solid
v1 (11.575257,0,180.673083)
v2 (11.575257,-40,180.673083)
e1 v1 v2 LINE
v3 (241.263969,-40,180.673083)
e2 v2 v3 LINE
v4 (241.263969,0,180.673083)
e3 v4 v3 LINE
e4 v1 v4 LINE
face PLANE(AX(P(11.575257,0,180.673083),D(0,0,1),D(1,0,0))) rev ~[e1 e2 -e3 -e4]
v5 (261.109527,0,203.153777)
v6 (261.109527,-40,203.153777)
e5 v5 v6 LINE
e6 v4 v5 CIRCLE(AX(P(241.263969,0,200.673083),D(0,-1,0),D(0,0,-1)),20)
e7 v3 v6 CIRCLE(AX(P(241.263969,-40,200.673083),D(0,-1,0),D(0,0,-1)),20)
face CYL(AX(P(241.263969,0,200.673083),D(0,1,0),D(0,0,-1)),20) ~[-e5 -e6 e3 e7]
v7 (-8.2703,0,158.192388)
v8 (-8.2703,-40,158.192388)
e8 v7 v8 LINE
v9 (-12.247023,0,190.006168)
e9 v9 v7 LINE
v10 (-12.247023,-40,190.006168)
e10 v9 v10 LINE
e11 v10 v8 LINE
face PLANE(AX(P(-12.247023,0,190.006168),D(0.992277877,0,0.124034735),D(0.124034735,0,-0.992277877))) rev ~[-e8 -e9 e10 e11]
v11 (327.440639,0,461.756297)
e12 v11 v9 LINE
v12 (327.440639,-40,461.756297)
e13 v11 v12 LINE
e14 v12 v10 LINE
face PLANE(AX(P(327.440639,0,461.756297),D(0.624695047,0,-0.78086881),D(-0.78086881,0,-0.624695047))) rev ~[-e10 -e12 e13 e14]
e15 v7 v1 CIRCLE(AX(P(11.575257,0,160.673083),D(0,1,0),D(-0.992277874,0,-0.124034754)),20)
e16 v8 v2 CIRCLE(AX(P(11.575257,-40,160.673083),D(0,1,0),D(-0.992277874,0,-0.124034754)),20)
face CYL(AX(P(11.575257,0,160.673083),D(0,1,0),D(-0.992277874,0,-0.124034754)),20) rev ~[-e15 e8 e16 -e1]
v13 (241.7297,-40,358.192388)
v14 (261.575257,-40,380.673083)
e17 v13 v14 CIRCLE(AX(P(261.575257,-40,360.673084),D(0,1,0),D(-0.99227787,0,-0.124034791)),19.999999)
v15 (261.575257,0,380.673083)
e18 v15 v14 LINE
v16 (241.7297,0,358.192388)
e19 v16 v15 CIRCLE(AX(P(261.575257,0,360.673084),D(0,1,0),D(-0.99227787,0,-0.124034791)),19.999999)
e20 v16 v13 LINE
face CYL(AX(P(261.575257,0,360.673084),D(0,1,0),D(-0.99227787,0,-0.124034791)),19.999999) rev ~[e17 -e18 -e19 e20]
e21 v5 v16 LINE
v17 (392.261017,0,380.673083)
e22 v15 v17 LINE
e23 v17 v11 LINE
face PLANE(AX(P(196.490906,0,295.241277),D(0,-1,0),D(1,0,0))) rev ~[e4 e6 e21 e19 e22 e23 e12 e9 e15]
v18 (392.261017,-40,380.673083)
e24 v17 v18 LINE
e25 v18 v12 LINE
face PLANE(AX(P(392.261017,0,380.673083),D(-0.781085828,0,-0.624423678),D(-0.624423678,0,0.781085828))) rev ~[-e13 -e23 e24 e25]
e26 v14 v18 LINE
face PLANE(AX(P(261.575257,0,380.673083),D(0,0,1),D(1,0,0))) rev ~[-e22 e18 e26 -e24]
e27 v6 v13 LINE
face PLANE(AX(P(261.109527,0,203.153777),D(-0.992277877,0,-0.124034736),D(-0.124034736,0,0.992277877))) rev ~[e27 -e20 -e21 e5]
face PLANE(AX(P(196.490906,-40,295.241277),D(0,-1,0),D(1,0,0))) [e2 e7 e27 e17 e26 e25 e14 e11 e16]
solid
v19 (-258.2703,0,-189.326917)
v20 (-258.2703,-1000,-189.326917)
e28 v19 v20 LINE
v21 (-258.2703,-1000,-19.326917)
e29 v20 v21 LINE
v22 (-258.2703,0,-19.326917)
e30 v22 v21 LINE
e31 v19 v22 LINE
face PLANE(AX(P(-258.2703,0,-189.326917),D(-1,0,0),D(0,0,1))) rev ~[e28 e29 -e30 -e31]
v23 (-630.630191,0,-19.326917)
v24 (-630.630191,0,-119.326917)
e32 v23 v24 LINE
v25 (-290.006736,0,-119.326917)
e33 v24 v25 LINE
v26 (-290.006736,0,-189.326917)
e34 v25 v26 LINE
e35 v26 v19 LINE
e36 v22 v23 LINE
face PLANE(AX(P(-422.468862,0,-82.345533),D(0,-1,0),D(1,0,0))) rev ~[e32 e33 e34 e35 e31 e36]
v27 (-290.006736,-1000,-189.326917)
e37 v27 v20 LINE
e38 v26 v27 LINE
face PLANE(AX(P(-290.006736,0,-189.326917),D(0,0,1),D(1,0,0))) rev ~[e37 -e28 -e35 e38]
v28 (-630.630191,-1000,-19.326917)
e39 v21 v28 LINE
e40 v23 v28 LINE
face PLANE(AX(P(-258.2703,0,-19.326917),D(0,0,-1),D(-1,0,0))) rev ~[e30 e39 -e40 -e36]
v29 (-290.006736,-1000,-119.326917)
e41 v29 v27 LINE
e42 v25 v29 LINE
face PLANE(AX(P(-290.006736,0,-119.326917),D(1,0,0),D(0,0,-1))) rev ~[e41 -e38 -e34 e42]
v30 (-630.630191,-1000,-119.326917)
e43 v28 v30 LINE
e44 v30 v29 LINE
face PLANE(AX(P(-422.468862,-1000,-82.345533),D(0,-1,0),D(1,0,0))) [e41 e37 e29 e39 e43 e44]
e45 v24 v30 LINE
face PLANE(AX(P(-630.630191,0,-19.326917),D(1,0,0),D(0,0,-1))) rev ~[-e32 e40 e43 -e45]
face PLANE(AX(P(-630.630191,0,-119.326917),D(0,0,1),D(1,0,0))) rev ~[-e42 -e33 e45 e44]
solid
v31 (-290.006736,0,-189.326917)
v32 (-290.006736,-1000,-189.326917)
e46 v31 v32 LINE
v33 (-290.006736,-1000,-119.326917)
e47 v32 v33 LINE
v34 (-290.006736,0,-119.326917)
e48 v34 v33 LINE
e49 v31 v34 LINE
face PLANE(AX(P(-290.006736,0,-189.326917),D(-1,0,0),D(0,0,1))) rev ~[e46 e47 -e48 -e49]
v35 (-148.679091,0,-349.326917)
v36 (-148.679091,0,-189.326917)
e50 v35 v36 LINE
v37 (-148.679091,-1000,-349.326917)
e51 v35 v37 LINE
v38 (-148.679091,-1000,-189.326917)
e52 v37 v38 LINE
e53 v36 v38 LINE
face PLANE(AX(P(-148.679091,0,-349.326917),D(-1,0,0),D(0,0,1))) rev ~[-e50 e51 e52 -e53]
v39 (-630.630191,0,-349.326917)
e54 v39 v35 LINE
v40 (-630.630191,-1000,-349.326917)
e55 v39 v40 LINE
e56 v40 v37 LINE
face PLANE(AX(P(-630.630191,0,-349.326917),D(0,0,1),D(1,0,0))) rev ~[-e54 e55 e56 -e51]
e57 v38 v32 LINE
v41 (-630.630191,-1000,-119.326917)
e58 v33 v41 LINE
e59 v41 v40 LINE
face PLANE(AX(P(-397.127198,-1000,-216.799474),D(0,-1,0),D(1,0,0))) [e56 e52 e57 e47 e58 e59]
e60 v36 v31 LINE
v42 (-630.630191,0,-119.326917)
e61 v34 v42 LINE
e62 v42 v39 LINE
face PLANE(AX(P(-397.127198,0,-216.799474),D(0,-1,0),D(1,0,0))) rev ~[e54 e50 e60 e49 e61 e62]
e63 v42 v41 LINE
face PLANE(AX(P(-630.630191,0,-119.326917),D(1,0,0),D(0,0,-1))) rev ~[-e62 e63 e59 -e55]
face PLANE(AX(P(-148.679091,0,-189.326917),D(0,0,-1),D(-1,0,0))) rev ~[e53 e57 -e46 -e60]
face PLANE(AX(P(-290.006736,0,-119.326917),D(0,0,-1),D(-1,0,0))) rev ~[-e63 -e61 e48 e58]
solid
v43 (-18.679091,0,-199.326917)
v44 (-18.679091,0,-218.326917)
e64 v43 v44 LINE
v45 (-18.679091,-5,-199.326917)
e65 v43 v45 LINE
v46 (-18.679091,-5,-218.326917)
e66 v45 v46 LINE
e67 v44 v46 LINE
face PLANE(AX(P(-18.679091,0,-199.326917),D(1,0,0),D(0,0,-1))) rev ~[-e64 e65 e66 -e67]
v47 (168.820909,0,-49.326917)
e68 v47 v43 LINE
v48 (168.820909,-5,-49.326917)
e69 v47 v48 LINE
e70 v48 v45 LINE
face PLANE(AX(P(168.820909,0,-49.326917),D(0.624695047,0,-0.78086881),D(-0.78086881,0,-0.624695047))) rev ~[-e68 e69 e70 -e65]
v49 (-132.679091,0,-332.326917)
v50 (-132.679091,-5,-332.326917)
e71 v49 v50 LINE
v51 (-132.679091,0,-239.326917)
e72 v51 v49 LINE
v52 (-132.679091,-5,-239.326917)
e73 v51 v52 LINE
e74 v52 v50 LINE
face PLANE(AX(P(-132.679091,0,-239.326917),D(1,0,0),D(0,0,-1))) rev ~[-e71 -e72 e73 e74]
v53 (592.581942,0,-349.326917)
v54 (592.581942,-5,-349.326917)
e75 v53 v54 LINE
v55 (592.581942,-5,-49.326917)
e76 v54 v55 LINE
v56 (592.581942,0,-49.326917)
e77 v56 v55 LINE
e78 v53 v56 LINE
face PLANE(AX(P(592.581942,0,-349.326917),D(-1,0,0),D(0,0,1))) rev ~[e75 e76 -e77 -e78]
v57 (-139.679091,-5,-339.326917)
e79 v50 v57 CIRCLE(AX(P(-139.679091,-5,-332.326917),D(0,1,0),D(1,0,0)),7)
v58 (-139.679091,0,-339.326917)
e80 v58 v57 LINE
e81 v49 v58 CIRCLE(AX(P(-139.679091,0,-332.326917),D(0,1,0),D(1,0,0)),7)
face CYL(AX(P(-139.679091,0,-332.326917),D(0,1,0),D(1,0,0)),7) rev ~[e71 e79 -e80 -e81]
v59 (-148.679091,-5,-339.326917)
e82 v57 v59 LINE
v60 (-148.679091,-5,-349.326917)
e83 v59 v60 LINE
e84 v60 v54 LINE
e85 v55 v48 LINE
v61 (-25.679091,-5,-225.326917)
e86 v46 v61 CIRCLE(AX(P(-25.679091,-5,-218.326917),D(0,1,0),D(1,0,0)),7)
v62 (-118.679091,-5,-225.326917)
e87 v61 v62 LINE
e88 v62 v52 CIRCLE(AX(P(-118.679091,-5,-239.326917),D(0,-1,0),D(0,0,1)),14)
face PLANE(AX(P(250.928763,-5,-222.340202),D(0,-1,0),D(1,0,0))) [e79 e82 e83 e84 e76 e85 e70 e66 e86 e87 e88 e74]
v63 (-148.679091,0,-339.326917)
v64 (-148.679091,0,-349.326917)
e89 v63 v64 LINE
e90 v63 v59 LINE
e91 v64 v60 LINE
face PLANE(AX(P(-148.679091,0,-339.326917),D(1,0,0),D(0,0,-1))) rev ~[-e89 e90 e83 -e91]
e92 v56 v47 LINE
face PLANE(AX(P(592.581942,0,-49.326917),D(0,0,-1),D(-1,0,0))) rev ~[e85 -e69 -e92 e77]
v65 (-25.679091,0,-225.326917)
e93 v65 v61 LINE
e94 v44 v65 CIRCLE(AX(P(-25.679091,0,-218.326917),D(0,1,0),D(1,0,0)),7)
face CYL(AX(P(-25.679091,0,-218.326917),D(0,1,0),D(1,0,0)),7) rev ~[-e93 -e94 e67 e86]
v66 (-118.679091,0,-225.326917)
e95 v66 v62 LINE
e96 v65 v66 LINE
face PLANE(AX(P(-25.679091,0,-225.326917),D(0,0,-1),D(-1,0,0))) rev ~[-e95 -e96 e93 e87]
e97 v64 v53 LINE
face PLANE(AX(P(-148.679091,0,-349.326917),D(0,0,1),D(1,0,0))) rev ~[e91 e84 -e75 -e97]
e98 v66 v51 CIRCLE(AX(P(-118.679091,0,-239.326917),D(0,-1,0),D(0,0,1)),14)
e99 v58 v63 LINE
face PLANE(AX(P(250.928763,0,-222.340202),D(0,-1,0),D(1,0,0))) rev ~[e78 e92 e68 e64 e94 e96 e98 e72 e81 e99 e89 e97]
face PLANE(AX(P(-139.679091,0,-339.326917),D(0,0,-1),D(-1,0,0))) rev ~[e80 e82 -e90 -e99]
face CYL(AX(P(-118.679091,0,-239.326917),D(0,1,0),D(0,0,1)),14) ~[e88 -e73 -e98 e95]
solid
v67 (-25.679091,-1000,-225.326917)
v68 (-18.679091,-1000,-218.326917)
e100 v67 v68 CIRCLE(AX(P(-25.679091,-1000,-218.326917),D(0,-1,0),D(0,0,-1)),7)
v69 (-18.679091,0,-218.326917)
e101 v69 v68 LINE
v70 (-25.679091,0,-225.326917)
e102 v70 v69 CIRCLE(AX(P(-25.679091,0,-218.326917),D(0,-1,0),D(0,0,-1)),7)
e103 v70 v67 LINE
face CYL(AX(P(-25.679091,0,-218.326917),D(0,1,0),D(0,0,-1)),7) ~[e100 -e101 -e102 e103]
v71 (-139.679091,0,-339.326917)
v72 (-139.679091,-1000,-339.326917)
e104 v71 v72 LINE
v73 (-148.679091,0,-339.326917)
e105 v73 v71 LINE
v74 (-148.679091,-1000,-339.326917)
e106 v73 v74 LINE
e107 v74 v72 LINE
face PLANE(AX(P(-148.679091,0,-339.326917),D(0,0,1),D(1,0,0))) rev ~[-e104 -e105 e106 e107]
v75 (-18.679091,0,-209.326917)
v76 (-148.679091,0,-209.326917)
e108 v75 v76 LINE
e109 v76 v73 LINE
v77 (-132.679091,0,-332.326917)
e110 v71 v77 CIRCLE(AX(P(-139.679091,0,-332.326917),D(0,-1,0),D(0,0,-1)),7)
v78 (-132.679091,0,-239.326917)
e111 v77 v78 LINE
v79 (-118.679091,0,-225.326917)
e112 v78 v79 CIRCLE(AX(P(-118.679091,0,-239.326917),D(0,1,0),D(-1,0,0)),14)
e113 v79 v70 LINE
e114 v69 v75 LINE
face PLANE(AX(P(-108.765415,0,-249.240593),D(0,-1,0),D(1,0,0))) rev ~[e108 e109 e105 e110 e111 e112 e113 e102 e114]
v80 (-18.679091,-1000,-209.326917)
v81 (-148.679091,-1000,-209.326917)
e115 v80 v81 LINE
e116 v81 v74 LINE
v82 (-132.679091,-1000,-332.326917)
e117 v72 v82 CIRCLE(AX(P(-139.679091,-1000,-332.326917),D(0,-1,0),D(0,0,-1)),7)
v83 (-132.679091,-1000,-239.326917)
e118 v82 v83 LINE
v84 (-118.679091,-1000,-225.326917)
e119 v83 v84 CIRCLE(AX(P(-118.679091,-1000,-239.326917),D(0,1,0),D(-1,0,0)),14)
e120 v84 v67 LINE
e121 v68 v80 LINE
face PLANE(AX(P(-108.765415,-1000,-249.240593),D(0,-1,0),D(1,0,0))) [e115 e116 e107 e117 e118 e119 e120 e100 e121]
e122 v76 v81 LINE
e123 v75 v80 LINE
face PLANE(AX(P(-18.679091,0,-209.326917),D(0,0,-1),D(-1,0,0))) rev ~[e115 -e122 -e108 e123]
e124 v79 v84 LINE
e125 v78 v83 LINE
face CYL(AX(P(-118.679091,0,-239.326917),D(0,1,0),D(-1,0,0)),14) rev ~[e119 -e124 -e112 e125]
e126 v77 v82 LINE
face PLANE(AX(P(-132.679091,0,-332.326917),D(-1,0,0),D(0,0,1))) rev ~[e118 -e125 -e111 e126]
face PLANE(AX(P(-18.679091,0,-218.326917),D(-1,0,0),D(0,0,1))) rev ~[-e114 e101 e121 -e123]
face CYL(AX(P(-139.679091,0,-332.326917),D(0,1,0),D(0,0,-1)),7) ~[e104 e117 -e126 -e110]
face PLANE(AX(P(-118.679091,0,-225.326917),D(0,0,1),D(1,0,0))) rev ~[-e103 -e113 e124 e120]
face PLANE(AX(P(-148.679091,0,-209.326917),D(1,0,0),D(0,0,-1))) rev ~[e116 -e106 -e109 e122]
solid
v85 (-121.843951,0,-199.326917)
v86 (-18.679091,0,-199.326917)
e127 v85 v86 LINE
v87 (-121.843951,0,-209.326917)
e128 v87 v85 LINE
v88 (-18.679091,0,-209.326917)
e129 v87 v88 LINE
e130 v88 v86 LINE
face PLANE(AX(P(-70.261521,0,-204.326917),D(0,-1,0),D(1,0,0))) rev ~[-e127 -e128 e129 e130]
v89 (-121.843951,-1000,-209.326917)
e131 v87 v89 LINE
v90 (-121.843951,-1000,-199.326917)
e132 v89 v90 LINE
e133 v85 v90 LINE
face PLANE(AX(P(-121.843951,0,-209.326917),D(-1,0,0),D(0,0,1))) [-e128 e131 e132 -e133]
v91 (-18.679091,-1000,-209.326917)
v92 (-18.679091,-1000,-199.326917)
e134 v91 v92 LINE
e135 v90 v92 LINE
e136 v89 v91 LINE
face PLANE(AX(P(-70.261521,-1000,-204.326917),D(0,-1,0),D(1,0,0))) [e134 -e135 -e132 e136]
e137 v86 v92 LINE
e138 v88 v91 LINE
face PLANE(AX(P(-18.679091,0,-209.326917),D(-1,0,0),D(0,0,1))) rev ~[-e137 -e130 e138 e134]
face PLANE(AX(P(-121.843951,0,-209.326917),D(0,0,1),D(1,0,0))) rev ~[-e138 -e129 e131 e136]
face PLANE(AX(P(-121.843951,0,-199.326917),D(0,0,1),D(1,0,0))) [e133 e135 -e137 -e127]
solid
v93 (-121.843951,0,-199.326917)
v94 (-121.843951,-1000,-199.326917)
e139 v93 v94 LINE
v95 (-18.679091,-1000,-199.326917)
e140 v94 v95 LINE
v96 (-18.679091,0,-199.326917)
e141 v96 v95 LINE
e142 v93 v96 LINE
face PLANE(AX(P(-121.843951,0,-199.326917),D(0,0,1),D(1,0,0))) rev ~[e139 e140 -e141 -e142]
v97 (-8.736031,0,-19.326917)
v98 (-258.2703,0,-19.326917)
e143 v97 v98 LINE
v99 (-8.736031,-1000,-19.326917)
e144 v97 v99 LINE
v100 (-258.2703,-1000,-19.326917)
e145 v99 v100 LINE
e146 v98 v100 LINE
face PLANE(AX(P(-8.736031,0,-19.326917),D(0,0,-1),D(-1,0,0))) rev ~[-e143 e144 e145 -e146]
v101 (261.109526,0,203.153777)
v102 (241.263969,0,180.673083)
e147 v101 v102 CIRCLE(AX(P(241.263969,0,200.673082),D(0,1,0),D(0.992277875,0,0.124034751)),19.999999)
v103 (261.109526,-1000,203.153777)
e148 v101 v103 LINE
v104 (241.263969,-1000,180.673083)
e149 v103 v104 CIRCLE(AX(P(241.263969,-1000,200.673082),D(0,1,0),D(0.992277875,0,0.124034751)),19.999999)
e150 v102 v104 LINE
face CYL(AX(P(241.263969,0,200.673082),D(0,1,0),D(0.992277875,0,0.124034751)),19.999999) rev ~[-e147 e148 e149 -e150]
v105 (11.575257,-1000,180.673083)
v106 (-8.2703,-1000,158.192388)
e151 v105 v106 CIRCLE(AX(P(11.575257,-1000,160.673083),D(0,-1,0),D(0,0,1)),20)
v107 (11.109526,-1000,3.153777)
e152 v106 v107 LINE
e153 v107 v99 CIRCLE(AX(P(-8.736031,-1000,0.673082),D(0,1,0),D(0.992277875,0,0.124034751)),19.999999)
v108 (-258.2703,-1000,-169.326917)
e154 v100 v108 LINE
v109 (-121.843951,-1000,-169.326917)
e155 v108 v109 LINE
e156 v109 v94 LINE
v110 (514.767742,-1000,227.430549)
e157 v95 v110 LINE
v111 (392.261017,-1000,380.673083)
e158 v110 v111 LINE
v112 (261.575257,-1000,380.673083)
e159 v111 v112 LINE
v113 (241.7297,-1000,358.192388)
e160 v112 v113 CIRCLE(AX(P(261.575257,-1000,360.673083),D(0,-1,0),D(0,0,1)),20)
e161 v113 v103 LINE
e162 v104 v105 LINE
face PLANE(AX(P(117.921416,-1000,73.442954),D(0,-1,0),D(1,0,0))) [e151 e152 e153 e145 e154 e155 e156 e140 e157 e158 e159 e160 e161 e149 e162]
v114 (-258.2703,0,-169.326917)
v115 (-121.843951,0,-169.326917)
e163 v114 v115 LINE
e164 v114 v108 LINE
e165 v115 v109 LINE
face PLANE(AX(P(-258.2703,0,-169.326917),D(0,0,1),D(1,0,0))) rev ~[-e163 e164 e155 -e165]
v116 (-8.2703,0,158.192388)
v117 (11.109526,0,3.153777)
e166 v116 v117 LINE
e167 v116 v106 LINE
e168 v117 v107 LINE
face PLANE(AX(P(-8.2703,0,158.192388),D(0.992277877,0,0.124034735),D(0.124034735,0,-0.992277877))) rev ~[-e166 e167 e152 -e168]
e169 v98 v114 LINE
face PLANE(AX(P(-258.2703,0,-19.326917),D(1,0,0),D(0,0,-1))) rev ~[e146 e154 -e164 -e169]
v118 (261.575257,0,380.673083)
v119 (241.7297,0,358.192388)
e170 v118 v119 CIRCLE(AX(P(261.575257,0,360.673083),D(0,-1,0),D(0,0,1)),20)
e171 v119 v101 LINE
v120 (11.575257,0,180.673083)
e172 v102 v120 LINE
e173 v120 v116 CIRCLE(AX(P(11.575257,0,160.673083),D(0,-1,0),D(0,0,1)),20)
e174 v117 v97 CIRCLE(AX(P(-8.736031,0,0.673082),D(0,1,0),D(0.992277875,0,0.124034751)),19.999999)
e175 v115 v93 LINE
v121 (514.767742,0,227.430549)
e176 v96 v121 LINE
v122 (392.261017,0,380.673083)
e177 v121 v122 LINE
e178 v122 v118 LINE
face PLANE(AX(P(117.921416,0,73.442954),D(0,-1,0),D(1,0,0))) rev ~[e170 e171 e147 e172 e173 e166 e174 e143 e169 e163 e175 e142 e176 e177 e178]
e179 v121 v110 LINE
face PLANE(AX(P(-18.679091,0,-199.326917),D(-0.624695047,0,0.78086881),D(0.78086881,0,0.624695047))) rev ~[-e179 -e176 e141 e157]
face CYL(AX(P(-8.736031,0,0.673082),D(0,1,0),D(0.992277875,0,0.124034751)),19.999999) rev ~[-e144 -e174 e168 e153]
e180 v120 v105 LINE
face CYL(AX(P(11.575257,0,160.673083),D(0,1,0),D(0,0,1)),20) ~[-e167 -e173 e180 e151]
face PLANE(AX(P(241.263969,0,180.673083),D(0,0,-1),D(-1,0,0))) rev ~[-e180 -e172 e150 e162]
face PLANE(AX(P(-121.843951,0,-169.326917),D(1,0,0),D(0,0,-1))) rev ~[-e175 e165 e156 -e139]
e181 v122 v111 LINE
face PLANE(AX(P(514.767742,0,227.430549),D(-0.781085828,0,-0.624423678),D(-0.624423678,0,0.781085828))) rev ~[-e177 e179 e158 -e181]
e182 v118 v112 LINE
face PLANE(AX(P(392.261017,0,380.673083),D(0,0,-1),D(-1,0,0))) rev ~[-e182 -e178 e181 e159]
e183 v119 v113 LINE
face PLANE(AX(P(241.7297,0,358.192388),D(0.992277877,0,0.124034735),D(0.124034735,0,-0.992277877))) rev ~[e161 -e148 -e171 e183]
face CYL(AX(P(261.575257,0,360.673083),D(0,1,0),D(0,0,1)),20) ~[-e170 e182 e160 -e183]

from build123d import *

# Parameters (mm, degrees)
F1_DEPTH = 1000
F2_DEPTH = 1000
F3_DEPTH = 1000
F4_DEPTH = 40
F5_DEPTH = 1000
F0_W     = 103.16486
F0_H     = 10
F6_DEPTH = 1000
F7_DEPTH = 5


# Not quite as in the source:
# - ends of sketch curves that miss each other by under 0.0002 mm in the source are joined


with BuildPart() as f1:
    # F0 (on Front) → F1 (new body)
    with BuildSketch(Plane.XZ):
        Polygon((-148.679091, -189.326917), (-258.2703, -189.326917), (-290.006736, -189.326917), (-290.006736, -119.326917), (-630.630191, -119.326917), (-630.630191, -299.326917), (-148.679091, -299.326917), (-148.679091, -209.326917), align=None)
        Polygon((-148.679091, -299.326917), (-630.630191, -299.326917), (-630.630191, -349.326917), (-148.679091, -349.326917), (-148.679091, -339.326917), align=None)
    extrude(amount=F1_DEPTH)


with BuildPart() as f2:
    # F0 (on Front) → F2 (new body)
    with BuildSketch(Plane.XZ):
        Polygon((-258.2703, -169.326917), (-258.2703, -19.326917), (-630.630191, -19.326917), (-630.630191, -119.326917), (-290.006736, -119.326917), (-290.006736, -189.326917), (-258.2703, -189.326917), align=None)
    extrude(amount=F2_DEPTH)


with BuildPart() as f3:
    # F0 (on Front) → F3 (new body)
    with BuildSketch(Plane.XZ):
        with BuildLine():
            Line((-8.736031, -19.326917), (-258.2703, -19.326917))
            Line((-258.2703, -19.326917), (-258.2703, -169.326917))
            Line((-258.2703, -169.326917), (-148.679091, -169.326917))
            Line((-148.679091, -169.326917), (-121.843951, -169.326917))
            Line((-121.843951, -169.326917), (-121.843951, -199.326917))
            Line((-121.843951, -199.326917), (-18.679091, -199.326917))
            Line((-18.679091, -199.326917), (168.8209090686, -49.3269170857))
            Line((168.8209090686, -49.3269170857), (514.767742, 227.430549))
            Line((514.767742, 227.430549), (392.2610169622, 380.6730829698))
            Line((392.2610169622, 380.6730829698), (261.575257, 380.673083))
            ThreePointArc((261.575257, 380.673083), (246.5816933606, 373.9091341252), (241.7296995119, 358.192387939))
            Line((241.7296995119, 358.192387939), (261.109526, 203.153777))
            ThreePointArc((261.109526, 203.153777), (256.2575323111, 187.4370315028), (241.263969, 180.673083))
            Line((241.263969, 180.673083), (11.575257, 180.673083))
            ThreePointArc((11.575257, 180.673083), (-3.4183066394, 173.9091341252), (-8.2703004881, 158.192387939))
            Line((-8.2703004881, 158.192387939), (11.109526, 3.153777))
            ThreePointArc((11.109526, 3.153777), (6.2575323111, -12.5629684972), (-8.736031, -19.326917))
        make_face()
    extrude(amount=F3_DEPTH)


with BuildPart() as f4:
    # F0 (on Front) → F4 (new body)
    with BuildSketch(Plane.XZ):
        with BuildLine():
            Line((-12.247023, 190.006168), (-8.2703004714, 158.1923879411))
            ThreePointArc((-8.2703004714, 158.1923879411), (-3.4183066394, 173.9091341252), (11.575257, 180.673083))
            Line((11.575257, 180.673083), (241.263969, 180.673083))
            ThreePointArc((241.263969, 180.673083), (256.2575323111, 187.4370315028), (261.1095266112, 203.1537770764))
            Line((261.1095266112, 203.1537770764), (241.7297, 358.192388))
            ThreePointArc((241.7297, 358.192388), (246.5816933606, 373.9091341252), (261.575257, 380.673083))
            Line((261.575257, 380.673083), (392.261017, 380.673083))
            Line((392.261017, 380.673083), (327.4406389587, 461.756296967))
            Line((327.4406389587, 461.756296967), (-12.247023, 190.006168))
        make_face()
    extrude(amount=F4_DEPTH)


with BuildPart() as f5:
    # F0 (on Front) → F5 (new body)
    with BuildSketch(Plane.XZ):
        with BuildLine():
            Line((-121.843951, -209.326917), (-148.679091, -209.326917))
            Line((-148.679091, -209.326917), (-148.679091, -299.326917))
            Line((-148.679091, -299.326917), (-148.679091, -339.326917))
            Line((-148.679091, -339.326917), (-139.679091, -339.326917))
            ThreePointArc((-139.679091, -339.326917), (-134.7293435317, -337.2766644683), (-132.679091, -332.326917))
            Line((-132.679091, -332.326917), (-132.679091, -239.326917))
            ThreePointArc((-132.679091, -239.326917), (-128.5785859366, -229.4274220634), (-118.679091, -225.326917))
            Line((-118.679091, -225.326917), (-25.679091, -225.326917))
            ThreePointArc((-25.679091, -225.326917), (-20.7293435317, -223.2766644683), (-18.679091, -218.326917))
            Line((-18.679091, -218.326917), (-18.679091, -209.326917))
            Line((-18.679091, -209.326917), (-121.843951, -209.326917))
        make_face()
    extrude(amount=F5_DEPTH)


with BuildPart() as f6:
    # F0 (on Front) → F6 (new body)
    with BuildSketch(Plane.XZ):
        with Locations((-70.261521, -204.326917)):
            Rectangle(F0_W, F0_H)
    extrude(amount=F6_DEPTH)


with BuildPart() as f7:
    # F0 (on Front) → F7 (new body)
    with BuildSketch(Plane.XZ):
        with BuildLine():
            Line((168.8209090686, -49.3269170857), (-18.679091, -199.326917))
            Line((-18.679091, -199.326917), (-18.679091, -209.326917))
            Line((-18.679091, -209.326917), (-18.679091, -218.326917))
            ThreePointArc((-18.679091, -218.326917), (-20.7293435317, -223.2766644683), (-25.679091, -225.326917))
            Line((-25.679091, -225.326917), (-118.679091, -225.326917))
            ThreePointArc((-118.679091, -225.326917), (-128.5785859366, -229.4274220634), (-132.679091, -239.326917))
            Line((-132.679091, -239.326917), (-132.679091, -332.326917))
            ThreePointArc((-132.679091, -332.326917), (-134.7293435317, -337.2766644683), (-139.679091, -339.326917))
            Line((-139.679091, -339.326917), (-148.679091, -339.326917))
            Line((-148.679091, -339.326917), (-148.679091, -349.326917))
            Line((-148.679091, -349.326917), (592.581942, -349.326917))
            Line((592.581942, -349.326917), (592.581942, -49.326917))
            Line((592.581942, -49.326917), (168.8209090686, -49.3269170857))
        make_face()
    extrude(amount=F7_DEPTH)


solid = Compound([f1.part, f2.part, f3.part, f4.part, f5.part, f6.part, f7.part])
